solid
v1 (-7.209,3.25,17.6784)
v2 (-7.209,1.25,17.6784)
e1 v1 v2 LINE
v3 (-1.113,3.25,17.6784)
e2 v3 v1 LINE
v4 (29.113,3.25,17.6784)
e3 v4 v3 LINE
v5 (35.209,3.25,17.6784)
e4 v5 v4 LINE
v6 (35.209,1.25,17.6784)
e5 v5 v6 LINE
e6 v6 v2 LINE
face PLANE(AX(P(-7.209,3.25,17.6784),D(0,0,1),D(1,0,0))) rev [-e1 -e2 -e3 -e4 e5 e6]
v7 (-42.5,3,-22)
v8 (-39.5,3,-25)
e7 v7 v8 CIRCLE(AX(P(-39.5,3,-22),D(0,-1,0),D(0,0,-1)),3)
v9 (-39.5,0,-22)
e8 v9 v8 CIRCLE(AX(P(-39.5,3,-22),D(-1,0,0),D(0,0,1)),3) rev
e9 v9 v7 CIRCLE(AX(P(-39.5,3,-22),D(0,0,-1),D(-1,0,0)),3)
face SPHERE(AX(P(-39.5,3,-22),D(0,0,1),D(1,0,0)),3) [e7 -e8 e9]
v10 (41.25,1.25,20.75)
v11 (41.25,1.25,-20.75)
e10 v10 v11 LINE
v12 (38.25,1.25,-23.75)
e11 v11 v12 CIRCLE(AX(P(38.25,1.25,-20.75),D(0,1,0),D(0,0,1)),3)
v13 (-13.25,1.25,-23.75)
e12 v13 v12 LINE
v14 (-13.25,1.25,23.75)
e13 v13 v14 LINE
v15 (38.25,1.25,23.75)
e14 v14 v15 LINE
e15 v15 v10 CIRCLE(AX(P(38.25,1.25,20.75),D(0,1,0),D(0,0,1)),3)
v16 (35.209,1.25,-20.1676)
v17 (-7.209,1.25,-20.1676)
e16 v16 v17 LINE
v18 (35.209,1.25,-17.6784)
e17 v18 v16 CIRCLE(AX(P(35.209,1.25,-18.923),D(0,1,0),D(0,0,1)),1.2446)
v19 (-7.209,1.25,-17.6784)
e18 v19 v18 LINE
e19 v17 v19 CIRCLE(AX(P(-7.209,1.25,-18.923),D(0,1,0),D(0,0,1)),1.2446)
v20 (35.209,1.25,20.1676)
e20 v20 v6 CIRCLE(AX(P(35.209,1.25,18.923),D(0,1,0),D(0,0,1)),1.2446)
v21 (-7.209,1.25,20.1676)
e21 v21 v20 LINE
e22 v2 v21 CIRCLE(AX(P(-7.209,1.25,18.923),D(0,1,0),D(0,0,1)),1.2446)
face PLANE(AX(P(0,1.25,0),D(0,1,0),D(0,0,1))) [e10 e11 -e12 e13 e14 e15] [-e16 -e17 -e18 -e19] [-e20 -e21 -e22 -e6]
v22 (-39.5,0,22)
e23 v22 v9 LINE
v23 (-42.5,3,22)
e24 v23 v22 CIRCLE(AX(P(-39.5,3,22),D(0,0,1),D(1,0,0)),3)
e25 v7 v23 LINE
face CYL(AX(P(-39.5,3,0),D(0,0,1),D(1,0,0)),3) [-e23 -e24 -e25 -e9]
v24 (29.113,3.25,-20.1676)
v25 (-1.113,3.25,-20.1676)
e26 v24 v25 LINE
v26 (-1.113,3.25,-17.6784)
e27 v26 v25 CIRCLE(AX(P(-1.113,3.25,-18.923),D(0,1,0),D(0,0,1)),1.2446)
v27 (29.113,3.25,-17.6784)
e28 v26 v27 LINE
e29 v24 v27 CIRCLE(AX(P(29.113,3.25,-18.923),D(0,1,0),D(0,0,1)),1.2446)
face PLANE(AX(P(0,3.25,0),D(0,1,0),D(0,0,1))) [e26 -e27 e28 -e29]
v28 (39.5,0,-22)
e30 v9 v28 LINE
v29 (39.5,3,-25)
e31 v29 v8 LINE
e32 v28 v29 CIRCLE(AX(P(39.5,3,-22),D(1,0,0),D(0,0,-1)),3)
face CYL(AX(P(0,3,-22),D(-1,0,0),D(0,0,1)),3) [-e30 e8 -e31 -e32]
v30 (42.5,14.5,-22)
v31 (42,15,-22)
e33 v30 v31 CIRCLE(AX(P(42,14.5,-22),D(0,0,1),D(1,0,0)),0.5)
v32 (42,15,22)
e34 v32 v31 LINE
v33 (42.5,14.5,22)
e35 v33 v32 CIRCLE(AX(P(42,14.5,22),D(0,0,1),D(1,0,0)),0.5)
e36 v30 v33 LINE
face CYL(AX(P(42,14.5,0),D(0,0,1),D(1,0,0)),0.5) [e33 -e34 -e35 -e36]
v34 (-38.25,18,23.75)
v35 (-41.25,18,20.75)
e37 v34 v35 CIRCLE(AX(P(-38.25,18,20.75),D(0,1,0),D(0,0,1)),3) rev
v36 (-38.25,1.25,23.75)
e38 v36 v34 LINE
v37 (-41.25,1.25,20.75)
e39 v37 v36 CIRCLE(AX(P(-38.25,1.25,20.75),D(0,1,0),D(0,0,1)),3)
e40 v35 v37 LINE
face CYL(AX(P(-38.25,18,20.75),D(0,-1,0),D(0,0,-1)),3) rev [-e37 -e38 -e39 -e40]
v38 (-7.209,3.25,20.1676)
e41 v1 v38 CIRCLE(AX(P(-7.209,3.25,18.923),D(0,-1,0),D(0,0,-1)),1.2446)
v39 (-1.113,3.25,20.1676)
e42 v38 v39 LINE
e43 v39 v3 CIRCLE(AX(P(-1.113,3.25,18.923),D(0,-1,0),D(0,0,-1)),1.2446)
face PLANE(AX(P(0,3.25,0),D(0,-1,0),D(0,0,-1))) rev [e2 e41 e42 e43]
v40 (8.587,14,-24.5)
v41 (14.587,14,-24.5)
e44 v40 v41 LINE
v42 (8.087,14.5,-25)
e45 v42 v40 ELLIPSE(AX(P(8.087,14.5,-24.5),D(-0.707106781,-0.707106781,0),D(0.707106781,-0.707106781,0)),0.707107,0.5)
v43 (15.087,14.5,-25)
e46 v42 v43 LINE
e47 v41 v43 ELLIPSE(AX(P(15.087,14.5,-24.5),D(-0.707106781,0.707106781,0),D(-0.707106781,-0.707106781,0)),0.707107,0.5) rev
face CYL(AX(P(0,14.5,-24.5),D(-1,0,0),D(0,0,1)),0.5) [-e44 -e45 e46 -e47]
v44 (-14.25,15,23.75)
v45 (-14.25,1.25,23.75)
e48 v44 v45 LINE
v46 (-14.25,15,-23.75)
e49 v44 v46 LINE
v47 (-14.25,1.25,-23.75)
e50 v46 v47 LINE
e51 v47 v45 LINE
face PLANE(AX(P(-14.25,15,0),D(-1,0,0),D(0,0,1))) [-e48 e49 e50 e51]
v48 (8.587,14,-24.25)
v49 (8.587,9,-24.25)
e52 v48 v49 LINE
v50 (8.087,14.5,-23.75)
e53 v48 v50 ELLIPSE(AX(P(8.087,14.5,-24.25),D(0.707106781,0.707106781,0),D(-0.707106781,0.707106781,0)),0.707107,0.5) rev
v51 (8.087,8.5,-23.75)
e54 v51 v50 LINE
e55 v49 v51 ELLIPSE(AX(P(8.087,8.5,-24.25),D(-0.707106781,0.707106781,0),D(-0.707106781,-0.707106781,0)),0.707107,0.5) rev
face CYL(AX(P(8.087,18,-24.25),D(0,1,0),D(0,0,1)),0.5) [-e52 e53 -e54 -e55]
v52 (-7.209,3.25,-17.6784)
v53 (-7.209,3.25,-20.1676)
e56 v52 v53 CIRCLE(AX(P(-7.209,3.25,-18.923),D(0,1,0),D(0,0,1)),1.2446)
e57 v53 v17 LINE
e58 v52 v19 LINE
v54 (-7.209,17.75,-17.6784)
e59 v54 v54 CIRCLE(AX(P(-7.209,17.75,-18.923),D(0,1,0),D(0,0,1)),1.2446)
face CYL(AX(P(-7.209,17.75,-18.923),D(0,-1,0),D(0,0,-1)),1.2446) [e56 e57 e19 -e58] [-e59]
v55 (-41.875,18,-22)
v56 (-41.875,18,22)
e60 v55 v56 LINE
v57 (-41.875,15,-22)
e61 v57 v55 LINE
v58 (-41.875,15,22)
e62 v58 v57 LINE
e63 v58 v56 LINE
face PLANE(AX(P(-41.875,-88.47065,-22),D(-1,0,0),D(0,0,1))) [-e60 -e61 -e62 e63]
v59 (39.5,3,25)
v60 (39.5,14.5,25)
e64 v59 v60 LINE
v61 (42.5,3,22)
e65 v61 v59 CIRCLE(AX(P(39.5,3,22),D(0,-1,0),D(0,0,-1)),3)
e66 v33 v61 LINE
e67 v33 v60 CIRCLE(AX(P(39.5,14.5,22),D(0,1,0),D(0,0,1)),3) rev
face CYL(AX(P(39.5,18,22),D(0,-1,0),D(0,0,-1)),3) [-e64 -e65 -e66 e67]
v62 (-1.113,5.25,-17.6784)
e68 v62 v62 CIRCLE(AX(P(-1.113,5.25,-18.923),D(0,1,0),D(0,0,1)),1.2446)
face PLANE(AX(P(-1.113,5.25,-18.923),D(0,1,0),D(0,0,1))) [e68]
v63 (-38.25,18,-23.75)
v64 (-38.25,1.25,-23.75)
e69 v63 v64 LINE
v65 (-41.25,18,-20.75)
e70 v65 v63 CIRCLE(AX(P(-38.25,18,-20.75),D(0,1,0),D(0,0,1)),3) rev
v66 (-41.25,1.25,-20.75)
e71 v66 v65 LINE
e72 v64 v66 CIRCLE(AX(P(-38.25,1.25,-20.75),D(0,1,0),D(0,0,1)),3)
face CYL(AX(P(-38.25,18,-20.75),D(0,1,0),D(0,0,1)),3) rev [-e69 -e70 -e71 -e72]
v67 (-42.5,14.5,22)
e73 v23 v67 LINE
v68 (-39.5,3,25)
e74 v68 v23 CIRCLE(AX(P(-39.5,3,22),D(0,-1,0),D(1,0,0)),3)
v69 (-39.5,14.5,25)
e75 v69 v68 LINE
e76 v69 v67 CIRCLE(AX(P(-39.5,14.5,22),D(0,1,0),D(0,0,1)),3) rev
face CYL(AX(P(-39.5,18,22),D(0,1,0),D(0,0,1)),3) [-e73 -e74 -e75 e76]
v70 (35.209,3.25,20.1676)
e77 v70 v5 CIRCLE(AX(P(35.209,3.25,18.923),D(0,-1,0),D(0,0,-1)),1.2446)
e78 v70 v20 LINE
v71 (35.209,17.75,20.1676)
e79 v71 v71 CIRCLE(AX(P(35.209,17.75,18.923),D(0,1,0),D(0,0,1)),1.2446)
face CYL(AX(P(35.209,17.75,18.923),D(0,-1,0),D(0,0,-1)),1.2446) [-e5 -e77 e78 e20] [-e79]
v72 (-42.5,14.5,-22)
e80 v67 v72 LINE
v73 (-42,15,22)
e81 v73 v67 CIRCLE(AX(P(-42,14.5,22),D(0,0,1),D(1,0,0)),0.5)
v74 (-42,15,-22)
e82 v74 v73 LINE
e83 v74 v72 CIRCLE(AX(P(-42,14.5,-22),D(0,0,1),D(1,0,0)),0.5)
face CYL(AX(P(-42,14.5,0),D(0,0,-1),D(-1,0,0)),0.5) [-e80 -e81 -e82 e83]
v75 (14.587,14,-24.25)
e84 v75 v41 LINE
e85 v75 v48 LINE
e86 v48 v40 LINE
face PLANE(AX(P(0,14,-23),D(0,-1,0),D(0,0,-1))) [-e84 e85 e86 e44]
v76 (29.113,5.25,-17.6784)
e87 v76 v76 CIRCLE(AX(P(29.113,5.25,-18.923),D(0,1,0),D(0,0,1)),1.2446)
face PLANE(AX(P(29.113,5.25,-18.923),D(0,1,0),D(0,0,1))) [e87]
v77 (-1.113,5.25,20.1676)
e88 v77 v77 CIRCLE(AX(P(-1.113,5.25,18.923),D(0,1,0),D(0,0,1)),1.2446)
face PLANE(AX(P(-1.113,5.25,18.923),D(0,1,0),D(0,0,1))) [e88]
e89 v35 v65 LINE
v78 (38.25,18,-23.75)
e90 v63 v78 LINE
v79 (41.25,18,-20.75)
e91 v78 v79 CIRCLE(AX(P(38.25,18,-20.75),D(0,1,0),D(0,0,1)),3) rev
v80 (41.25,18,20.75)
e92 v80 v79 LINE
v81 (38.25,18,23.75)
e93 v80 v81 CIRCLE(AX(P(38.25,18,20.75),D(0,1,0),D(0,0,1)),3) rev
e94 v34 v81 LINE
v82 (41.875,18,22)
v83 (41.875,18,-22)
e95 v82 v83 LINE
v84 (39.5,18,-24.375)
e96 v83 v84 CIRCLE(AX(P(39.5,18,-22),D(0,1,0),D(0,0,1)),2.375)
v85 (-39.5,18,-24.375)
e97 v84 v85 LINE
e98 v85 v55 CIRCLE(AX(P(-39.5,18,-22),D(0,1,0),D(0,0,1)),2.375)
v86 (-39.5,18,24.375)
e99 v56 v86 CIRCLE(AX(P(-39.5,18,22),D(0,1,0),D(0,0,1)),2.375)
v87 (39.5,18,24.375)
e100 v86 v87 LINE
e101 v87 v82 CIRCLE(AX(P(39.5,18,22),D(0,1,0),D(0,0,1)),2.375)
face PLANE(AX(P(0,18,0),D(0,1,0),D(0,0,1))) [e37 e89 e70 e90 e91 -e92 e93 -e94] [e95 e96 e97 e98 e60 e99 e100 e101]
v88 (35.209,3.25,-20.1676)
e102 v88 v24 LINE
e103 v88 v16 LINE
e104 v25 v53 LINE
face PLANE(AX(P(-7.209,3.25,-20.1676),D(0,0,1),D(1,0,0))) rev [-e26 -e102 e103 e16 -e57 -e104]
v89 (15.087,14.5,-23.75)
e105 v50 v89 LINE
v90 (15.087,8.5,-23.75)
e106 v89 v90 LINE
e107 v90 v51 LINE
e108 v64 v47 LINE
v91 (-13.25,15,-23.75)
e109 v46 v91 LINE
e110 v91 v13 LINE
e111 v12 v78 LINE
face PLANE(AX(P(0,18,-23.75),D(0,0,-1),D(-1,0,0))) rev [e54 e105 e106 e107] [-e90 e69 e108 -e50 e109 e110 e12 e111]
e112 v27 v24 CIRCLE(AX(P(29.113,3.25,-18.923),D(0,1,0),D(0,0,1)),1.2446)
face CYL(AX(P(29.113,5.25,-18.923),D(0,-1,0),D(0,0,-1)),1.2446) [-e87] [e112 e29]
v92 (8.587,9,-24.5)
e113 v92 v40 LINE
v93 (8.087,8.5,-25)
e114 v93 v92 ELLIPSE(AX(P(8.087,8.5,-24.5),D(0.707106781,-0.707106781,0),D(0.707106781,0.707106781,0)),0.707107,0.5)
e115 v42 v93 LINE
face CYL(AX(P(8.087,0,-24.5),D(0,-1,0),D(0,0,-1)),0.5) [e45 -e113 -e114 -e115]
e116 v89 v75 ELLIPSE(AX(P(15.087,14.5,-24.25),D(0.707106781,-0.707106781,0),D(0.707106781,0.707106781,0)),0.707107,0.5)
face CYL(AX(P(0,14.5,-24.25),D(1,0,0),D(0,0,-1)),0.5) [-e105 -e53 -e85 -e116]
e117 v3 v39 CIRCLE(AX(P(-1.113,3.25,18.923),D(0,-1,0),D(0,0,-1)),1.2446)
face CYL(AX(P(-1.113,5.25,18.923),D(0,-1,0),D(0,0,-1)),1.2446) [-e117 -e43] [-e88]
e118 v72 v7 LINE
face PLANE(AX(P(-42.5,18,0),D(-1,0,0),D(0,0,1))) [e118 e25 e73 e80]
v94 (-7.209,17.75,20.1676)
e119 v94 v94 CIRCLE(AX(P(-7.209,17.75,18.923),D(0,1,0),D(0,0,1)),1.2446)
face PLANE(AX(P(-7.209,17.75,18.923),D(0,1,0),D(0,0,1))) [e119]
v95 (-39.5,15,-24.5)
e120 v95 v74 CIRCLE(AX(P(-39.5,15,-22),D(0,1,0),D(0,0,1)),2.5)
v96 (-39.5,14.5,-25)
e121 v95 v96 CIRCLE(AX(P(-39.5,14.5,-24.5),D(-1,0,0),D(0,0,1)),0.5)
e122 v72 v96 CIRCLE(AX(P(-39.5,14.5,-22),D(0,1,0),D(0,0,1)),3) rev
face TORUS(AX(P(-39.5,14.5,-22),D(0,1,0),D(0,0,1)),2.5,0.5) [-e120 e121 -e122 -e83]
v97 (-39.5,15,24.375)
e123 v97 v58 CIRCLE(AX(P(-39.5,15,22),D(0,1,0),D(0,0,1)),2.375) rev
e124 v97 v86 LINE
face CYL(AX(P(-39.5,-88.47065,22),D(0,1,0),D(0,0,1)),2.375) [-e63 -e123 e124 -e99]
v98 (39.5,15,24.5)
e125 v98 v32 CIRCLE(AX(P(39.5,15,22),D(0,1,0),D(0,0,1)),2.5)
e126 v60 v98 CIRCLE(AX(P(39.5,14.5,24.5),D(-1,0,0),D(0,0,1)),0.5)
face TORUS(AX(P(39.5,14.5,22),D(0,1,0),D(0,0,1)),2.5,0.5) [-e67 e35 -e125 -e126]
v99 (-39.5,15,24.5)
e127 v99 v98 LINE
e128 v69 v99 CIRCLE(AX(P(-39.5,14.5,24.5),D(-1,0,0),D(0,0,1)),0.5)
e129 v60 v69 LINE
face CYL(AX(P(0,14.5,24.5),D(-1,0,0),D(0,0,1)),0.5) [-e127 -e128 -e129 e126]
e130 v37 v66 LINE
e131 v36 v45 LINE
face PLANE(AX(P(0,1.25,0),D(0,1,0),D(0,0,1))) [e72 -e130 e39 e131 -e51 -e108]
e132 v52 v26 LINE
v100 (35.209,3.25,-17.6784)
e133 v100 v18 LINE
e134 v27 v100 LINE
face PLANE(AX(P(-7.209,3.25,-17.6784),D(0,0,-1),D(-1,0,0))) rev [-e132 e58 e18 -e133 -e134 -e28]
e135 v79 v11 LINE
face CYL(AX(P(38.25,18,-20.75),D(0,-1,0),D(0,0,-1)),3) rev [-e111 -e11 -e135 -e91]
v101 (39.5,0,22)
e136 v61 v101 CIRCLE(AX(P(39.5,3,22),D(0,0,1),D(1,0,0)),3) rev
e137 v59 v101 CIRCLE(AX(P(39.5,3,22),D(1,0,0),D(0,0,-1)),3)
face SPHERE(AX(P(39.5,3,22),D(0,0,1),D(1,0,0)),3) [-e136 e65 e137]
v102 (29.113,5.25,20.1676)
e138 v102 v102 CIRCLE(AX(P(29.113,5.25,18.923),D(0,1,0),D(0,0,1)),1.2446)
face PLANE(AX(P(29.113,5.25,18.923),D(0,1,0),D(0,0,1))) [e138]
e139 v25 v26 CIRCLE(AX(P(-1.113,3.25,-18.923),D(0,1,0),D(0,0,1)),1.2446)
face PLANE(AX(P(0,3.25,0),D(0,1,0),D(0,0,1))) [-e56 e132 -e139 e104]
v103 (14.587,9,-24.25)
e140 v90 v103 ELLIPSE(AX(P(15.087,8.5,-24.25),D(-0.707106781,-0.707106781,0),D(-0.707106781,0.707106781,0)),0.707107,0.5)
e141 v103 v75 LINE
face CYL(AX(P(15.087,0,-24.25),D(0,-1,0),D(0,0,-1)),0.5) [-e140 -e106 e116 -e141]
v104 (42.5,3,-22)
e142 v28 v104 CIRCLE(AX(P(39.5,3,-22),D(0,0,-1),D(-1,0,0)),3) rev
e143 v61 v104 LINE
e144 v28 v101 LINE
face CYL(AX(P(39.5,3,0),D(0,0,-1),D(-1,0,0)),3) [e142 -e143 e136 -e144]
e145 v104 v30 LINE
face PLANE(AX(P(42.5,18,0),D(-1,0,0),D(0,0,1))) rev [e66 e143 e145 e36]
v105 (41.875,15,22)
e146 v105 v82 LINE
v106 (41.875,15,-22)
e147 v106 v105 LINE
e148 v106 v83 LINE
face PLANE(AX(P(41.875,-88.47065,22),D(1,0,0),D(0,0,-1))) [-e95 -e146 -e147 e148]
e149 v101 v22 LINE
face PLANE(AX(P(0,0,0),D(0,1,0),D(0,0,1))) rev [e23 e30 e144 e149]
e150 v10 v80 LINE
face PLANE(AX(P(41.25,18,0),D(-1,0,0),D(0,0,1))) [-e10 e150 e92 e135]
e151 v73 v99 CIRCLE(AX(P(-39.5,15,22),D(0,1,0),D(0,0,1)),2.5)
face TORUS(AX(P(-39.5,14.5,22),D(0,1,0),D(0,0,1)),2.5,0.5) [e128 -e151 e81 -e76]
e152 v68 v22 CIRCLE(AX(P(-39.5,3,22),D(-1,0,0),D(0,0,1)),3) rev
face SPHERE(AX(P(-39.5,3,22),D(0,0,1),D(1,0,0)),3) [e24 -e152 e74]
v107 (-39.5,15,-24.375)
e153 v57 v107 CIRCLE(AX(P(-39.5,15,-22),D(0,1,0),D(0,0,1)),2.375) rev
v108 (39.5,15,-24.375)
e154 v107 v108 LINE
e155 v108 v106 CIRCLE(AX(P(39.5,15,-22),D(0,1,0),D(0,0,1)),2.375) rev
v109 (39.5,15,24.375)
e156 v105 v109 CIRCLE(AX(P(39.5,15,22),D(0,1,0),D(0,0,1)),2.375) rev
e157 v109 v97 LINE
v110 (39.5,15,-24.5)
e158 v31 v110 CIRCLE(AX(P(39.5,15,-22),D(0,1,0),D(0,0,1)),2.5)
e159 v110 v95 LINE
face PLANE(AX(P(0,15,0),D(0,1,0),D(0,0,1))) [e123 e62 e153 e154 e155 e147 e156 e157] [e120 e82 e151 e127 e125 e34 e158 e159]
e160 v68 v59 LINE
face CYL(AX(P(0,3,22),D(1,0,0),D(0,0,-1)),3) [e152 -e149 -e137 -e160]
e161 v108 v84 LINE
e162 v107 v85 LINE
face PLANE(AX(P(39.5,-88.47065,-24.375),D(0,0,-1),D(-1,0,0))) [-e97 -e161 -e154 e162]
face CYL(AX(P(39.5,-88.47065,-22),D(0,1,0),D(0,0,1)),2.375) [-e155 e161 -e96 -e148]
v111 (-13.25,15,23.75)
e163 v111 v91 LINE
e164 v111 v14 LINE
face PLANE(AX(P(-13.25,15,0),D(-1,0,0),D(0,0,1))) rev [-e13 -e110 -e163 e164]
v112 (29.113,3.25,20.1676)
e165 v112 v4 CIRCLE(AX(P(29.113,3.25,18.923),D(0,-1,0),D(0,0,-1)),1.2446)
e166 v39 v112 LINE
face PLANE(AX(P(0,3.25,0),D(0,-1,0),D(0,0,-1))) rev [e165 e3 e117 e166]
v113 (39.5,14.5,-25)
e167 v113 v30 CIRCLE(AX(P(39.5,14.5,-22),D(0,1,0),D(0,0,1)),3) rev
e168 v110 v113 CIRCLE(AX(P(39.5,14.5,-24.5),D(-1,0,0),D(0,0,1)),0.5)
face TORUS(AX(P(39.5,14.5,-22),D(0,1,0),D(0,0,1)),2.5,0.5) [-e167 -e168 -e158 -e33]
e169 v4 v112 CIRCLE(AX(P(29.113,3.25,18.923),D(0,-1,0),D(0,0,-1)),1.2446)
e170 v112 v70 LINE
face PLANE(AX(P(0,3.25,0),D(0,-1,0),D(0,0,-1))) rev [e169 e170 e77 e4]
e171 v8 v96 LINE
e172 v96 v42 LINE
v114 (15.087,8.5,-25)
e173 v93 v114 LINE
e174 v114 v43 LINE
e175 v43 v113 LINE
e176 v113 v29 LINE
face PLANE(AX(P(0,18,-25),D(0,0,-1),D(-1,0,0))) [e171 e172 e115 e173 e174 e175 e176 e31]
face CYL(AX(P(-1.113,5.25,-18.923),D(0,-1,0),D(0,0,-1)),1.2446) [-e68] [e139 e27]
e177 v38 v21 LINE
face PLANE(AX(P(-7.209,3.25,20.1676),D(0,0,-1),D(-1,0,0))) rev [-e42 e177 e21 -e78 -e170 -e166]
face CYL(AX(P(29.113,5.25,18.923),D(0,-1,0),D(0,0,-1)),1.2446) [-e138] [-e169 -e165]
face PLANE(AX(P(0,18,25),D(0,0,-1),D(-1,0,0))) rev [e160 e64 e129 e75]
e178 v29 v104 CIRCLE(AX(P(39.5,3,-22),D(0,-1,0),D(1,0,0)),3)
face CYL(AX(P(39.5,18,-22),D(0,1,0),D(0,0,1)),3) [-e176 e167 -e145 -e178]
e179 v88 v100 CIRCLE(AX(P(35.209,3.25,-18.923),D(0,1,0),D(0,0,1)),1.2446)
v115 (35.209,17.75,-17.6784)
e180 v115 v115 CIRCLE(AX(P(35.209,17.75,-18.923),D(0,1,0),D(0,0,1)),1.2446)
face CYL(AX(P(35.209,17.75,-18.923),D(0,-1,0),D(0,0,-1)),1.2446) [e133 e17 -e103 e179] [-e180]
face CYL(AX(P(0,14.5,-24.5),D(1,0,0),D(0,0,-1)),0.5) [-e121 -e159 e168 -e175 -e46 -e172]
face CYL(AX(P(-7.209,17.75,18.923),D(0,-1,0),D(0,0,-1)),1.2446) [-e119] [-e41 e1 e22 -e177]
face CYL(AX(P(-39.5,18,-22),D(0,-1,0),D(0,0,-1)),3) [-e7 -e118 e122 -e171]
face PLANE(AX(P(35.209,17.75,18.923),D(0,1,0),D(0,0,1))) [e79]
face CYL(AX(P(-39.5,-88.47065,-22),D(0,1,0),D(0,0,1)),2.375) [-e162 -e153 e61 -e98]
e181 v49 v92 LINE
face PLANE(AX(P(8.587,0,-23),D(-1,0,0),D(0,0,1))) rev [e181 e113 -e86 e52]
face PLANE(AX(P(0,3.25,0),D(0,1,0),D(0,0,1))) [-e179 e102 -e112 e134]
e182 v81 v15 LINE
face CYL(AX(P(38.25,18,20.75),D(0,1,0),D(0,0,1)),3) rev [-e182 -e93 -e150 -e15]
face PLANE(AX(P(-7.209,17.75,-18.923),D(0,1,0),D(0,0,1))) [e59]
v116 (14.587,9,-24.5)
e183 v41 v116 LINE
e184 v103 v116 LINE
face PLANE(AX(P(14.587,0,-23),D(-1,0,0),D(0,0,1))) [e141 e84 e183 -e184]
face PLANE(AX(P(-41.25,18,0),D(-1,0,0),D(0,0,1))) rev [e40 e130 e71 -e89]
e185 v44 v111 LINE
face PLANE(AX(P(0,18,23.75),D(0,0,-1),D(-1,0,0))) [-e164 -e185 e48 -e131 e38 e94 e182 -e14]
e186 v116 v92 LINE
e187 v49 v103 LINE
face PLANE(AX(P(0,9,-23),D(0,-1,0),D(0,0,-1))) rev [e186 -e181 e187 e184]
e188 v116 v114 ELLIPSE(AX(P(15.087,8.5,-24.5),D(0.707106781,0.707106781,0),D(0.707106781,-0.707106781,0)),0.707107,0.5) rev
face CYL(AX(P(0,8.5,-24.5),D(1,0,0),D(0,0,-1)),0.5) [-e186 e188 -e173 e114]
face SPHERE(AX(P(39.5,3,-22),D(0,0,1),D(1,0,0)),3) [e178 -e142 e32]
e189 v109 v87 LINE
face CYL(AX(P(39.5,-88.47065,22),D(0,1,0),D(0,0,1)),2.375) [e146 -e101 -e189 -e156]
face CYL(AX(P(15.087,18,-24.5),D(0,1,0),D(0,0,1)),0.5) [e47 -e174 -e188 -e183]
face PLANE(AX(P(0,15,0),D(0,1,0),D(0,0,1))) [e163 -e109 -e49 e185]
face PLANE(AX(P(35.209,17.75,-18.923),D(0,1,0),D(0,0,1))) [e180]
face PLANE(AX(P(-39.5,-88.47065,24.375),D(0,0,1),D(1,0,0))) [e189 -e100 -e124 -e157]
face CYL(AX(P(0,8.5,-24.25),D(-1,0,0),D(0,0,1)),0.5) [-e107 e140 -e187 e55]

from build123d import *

# Parameters (mm, degrees)
SKETCH2_W           = 54.5
SKETCH2_H           = 47.5
SKETCH2_W_2         = 1
SKETCH2_W_3         = 27
BOSS_EXTRUDE3_DEPTH = 1.25
SKETCH2_4_W         = 85
SKETCH2_4_H         = 50
SKETCH2_4_W_2       = 82.5
SKETCH2_4_H_2       = 47.5
BOSS_EXTRUDE4_DEPTH = 18
SKETCH2_5_W         = 1
SKETCH2_5_H         = 47.5
BOSS_EXTRUDE5_DEPTH = 15
SKETCH5_R           = 1.2446
BOSS_EXTRUDE6_DEPTH = 16.5
SKETCH6_R           = 1.2446
BOSS_EXTRUDE7_DEPTH = 4
SKETCH7_W           = 42.418
SKETCH7_H           = 2.4892
BOSS_EXTRUDE9_DEPTH = 2
FILLET2_R           = 3
SKETCH10_OUTSIDE_W  = 107.048
SKETCH10_OUTSIDE_H  = 72.048
CUT_EXTRUDE4_DEPTH  = 3
FILLET3_R           = 0.5
SKETCH14_W          = 6
SKETCH14_H          = 5
CUT_EXTRUDE5_DEPTH  = 2
FILLET4_R           = 0.5


with BuildPart() as part:
    # Sketch2 → Boss-Extrude3 (new body)
    with BuildSketch(Plane(origin=(0, 0, 0), x_dir=(1, 0, 0), z_dir=(0, 1, 0))):
        with Locations((14, 0)):
            Rectangle(SKETCH2_W, SKETCH2_H)
        with Locations((-13.75, 0)):
            Rectangle(SKETCH2_W_2, SKETCH2_H)
        with Locations((-27.75, 0)):
            Rectangle(SKETCH2_W_3, SKETCH2_H)
    extrude(amount=BOSS_EXTRUDE3_DEPTH)

    # Sketch2<4> → Boss-Extrude4 (add)
    with BuildSketch(Plane(origin=(0, 0, 0), x_dir=(1, 0, 0), z_dir=(0, 1, 0))):
        Rectangle(SKETCH2_4_W, SKETCH2_4_H)
        Rectangle(SKETCH2_4_W_2, SKETCH2_4_H_2, mode=Mode.SUBTRACT)
    extrude(amount=BOSS_EXTRUDE4_DEPTH)

    # Sketch2<5> → Boss-Extrude5 (add)
    with BuildSketch(Plane(origin=(0, 0, 0), x_dir=(1, 0, 0), z_dir=(0, 1, 0))):
        with Locations((-13.75, 0)):
            Rectangle(SKETCH2_5_W, SKETCH2_5_H)
    extrude(amount=BOSS_EXTRUDE5_DEPTH)

    # Sketch5 → Boss-Extrude6 (add)
    with BuildSketch(Plane(origin=(0, 1.25, 0), x_dir=(1, 0, 0), z_dir=(0, 1, 0))):
        with Locations(Location((-7.209, 18.923, 0), (0, 0, 270))):
            Circle(SKETCH5_R)
        with Locations(Location((35.209, 18.923, 0), (0, 0, 270))):
            Circle(SKETCH5_R)
        with Locations(Location((-7.209, -18.923, 0), (0, 0, 270))):
            Circle(SKETCH5_R)
        with Locations(Location((35.209, -18.923, 0), (0, 0, 270))):
            Circle(SKETCH5_R)
    extrude(amount=BOSS_EXTRUDE6_DEPTH)

    # Sketch6 → Boss-Extrude7 (add)
    with BuildSketch(Plane(origin=(0, 1.25, 0), x_dir=(1, 0, 0), z_dir=(0, 1, 0))):
        with Locations(Location((-1.113, 18.923, 0), (0, 0, 270))):
            Circle(SKETCH6_R)
        with Locations(Location((29.113, 18.923, 0), (0, 0, 270))):
            Circle(SKETCH6_R)
        with Locations(Location((-1.113, -18.923, 0), (0, 0, 270))):
            Circle(SKETCH6_R)
        with Locations(Location((29.113, -18.923, 0), (0, 0, 270))):
            Circle(SKETCH6_R)
    extrude(amount=BOSS_EXTRUDE7_DEPTH)

    # Sketch7 → Boss-Extrude9 (add)
    with BuildSketch(Plane(origin=(0, 1.25, 0), x_dir=(1, 0, 0), z_dir=(0, 1, 0))):
        with Locations((14, -18.923)):
            Rectangle(SKETCH7_W, SKETCH7_H)
        with Locations((14, 18.923)):
            Rectangle(SKETCH7_W, SKETCH7_H)
    extrude(amount=BOSS_EXTRUDE9_DEPTH)

    # Fillet2
    fillet2_edges = [part.edges().sort_by_distance(p)[0] for p in [
        (41.25, 9.625, 23.75),
        (-41.25, 9.625, 23.75),
        (-41.25, 9.625, -23.75),
        (0, 0, 25),
        (-42.5, 9, 25),
        (42.5, 0, 0),
        (42.5, 9, 25),
        (42.5, 9, -25),
        (-42.5, 9, -25),
        (41.25, 9.625, -23.75),
        (-42.5, 0, 0),
        (0, 0, -25),
    ]]
    fillet(fillet2_edges, radius=FILLET2_R)

    # Sketch10 outside → Cut-Extrude4 (cut)
    with BuildSketch(Plane(origin=(0, 18, 0), x_dir=(1, 0, 0), z_dir=(0, 1, 0))):
        Rectangle(SKETCH10_OUTSIDE_W, SKETCH10_OUTSIDE_H)
        with BuildLine():
            Line((-41.875, 22), (-41.875, -22))
            ThreePointArc((-41.875, -22), (-41.179378605, -23.679378605), (-39.5, -24.375))
            Line((-39.5, -24.375), (39.5, -24.375))
            ThreePointArc((39.5, -24.375), (41.179378605, -23.679378605), (41.875, -22))
            Line((41.875, -22), (41.875, 22))
            ThreePointArc((41.875, 22), (41.179378605, 23.679378605), (39.5, 24.375))
            Line((39.5, 24.375), (-39.5, 24.375))
            ThreePointArc((-39.5, 24.375), (-41.179378605, 23.679378605), (-41.875, 22))
        make_face(mode=Mode.SUBTRACT)
    extrude(amount=-CUT_EXTRUDE4_DEPTH, mode=Mode.SUBTRACT)

    # Fillet3
    fillet3_edges = [part.edges().sort_by_distance(p)[0] for p in [
        (41.621320344, 15, -24.121320344),
        (0, 15, 25),
        (42.5, 15, 0),
        (-41.621320344, 15, 24.121320344),
        (-42.5, 15, 0),
        (-41.621320344, 15, -24.121320344),
        (0, 15, -25),
        (41.621320344, 15, 24.121320344),
    ]]
    fillet(fillet3_edges, radius=FILLET3_R)

    # Sketch14 → Cut-Extrude5 (cut)
    with BuildSketch(Plane.XY.offset(-25)):
        with Locations((11.587, 11.5)):
            Rectangle(SKETCH14_W, SKETCH14_H)
    extrude(amount=CUT_EXTRUDE5_DEPTH, mode=Mode.SUBTRACT)

    # Fillet4
    fillet4_edges = [part.edges().sort_by_distance(p)[0] for p in [
        (8.587, 11.5, -23.75),
        (11.587, 9, -23.75),
        (14.587, 11.5, -25),
        (11.587, 14, -25),
        (14.587, 11.5, -23.75),
        (11.587, 14, -23.75),
        (8.587, 11.5, -25),
        (11.587, 9, -25),
    ]]
    fillet(fillet4_edges, radius=FILLET4_R - 0.0001)  # a hair under: the kernel refuses the full size


solid = part.part
